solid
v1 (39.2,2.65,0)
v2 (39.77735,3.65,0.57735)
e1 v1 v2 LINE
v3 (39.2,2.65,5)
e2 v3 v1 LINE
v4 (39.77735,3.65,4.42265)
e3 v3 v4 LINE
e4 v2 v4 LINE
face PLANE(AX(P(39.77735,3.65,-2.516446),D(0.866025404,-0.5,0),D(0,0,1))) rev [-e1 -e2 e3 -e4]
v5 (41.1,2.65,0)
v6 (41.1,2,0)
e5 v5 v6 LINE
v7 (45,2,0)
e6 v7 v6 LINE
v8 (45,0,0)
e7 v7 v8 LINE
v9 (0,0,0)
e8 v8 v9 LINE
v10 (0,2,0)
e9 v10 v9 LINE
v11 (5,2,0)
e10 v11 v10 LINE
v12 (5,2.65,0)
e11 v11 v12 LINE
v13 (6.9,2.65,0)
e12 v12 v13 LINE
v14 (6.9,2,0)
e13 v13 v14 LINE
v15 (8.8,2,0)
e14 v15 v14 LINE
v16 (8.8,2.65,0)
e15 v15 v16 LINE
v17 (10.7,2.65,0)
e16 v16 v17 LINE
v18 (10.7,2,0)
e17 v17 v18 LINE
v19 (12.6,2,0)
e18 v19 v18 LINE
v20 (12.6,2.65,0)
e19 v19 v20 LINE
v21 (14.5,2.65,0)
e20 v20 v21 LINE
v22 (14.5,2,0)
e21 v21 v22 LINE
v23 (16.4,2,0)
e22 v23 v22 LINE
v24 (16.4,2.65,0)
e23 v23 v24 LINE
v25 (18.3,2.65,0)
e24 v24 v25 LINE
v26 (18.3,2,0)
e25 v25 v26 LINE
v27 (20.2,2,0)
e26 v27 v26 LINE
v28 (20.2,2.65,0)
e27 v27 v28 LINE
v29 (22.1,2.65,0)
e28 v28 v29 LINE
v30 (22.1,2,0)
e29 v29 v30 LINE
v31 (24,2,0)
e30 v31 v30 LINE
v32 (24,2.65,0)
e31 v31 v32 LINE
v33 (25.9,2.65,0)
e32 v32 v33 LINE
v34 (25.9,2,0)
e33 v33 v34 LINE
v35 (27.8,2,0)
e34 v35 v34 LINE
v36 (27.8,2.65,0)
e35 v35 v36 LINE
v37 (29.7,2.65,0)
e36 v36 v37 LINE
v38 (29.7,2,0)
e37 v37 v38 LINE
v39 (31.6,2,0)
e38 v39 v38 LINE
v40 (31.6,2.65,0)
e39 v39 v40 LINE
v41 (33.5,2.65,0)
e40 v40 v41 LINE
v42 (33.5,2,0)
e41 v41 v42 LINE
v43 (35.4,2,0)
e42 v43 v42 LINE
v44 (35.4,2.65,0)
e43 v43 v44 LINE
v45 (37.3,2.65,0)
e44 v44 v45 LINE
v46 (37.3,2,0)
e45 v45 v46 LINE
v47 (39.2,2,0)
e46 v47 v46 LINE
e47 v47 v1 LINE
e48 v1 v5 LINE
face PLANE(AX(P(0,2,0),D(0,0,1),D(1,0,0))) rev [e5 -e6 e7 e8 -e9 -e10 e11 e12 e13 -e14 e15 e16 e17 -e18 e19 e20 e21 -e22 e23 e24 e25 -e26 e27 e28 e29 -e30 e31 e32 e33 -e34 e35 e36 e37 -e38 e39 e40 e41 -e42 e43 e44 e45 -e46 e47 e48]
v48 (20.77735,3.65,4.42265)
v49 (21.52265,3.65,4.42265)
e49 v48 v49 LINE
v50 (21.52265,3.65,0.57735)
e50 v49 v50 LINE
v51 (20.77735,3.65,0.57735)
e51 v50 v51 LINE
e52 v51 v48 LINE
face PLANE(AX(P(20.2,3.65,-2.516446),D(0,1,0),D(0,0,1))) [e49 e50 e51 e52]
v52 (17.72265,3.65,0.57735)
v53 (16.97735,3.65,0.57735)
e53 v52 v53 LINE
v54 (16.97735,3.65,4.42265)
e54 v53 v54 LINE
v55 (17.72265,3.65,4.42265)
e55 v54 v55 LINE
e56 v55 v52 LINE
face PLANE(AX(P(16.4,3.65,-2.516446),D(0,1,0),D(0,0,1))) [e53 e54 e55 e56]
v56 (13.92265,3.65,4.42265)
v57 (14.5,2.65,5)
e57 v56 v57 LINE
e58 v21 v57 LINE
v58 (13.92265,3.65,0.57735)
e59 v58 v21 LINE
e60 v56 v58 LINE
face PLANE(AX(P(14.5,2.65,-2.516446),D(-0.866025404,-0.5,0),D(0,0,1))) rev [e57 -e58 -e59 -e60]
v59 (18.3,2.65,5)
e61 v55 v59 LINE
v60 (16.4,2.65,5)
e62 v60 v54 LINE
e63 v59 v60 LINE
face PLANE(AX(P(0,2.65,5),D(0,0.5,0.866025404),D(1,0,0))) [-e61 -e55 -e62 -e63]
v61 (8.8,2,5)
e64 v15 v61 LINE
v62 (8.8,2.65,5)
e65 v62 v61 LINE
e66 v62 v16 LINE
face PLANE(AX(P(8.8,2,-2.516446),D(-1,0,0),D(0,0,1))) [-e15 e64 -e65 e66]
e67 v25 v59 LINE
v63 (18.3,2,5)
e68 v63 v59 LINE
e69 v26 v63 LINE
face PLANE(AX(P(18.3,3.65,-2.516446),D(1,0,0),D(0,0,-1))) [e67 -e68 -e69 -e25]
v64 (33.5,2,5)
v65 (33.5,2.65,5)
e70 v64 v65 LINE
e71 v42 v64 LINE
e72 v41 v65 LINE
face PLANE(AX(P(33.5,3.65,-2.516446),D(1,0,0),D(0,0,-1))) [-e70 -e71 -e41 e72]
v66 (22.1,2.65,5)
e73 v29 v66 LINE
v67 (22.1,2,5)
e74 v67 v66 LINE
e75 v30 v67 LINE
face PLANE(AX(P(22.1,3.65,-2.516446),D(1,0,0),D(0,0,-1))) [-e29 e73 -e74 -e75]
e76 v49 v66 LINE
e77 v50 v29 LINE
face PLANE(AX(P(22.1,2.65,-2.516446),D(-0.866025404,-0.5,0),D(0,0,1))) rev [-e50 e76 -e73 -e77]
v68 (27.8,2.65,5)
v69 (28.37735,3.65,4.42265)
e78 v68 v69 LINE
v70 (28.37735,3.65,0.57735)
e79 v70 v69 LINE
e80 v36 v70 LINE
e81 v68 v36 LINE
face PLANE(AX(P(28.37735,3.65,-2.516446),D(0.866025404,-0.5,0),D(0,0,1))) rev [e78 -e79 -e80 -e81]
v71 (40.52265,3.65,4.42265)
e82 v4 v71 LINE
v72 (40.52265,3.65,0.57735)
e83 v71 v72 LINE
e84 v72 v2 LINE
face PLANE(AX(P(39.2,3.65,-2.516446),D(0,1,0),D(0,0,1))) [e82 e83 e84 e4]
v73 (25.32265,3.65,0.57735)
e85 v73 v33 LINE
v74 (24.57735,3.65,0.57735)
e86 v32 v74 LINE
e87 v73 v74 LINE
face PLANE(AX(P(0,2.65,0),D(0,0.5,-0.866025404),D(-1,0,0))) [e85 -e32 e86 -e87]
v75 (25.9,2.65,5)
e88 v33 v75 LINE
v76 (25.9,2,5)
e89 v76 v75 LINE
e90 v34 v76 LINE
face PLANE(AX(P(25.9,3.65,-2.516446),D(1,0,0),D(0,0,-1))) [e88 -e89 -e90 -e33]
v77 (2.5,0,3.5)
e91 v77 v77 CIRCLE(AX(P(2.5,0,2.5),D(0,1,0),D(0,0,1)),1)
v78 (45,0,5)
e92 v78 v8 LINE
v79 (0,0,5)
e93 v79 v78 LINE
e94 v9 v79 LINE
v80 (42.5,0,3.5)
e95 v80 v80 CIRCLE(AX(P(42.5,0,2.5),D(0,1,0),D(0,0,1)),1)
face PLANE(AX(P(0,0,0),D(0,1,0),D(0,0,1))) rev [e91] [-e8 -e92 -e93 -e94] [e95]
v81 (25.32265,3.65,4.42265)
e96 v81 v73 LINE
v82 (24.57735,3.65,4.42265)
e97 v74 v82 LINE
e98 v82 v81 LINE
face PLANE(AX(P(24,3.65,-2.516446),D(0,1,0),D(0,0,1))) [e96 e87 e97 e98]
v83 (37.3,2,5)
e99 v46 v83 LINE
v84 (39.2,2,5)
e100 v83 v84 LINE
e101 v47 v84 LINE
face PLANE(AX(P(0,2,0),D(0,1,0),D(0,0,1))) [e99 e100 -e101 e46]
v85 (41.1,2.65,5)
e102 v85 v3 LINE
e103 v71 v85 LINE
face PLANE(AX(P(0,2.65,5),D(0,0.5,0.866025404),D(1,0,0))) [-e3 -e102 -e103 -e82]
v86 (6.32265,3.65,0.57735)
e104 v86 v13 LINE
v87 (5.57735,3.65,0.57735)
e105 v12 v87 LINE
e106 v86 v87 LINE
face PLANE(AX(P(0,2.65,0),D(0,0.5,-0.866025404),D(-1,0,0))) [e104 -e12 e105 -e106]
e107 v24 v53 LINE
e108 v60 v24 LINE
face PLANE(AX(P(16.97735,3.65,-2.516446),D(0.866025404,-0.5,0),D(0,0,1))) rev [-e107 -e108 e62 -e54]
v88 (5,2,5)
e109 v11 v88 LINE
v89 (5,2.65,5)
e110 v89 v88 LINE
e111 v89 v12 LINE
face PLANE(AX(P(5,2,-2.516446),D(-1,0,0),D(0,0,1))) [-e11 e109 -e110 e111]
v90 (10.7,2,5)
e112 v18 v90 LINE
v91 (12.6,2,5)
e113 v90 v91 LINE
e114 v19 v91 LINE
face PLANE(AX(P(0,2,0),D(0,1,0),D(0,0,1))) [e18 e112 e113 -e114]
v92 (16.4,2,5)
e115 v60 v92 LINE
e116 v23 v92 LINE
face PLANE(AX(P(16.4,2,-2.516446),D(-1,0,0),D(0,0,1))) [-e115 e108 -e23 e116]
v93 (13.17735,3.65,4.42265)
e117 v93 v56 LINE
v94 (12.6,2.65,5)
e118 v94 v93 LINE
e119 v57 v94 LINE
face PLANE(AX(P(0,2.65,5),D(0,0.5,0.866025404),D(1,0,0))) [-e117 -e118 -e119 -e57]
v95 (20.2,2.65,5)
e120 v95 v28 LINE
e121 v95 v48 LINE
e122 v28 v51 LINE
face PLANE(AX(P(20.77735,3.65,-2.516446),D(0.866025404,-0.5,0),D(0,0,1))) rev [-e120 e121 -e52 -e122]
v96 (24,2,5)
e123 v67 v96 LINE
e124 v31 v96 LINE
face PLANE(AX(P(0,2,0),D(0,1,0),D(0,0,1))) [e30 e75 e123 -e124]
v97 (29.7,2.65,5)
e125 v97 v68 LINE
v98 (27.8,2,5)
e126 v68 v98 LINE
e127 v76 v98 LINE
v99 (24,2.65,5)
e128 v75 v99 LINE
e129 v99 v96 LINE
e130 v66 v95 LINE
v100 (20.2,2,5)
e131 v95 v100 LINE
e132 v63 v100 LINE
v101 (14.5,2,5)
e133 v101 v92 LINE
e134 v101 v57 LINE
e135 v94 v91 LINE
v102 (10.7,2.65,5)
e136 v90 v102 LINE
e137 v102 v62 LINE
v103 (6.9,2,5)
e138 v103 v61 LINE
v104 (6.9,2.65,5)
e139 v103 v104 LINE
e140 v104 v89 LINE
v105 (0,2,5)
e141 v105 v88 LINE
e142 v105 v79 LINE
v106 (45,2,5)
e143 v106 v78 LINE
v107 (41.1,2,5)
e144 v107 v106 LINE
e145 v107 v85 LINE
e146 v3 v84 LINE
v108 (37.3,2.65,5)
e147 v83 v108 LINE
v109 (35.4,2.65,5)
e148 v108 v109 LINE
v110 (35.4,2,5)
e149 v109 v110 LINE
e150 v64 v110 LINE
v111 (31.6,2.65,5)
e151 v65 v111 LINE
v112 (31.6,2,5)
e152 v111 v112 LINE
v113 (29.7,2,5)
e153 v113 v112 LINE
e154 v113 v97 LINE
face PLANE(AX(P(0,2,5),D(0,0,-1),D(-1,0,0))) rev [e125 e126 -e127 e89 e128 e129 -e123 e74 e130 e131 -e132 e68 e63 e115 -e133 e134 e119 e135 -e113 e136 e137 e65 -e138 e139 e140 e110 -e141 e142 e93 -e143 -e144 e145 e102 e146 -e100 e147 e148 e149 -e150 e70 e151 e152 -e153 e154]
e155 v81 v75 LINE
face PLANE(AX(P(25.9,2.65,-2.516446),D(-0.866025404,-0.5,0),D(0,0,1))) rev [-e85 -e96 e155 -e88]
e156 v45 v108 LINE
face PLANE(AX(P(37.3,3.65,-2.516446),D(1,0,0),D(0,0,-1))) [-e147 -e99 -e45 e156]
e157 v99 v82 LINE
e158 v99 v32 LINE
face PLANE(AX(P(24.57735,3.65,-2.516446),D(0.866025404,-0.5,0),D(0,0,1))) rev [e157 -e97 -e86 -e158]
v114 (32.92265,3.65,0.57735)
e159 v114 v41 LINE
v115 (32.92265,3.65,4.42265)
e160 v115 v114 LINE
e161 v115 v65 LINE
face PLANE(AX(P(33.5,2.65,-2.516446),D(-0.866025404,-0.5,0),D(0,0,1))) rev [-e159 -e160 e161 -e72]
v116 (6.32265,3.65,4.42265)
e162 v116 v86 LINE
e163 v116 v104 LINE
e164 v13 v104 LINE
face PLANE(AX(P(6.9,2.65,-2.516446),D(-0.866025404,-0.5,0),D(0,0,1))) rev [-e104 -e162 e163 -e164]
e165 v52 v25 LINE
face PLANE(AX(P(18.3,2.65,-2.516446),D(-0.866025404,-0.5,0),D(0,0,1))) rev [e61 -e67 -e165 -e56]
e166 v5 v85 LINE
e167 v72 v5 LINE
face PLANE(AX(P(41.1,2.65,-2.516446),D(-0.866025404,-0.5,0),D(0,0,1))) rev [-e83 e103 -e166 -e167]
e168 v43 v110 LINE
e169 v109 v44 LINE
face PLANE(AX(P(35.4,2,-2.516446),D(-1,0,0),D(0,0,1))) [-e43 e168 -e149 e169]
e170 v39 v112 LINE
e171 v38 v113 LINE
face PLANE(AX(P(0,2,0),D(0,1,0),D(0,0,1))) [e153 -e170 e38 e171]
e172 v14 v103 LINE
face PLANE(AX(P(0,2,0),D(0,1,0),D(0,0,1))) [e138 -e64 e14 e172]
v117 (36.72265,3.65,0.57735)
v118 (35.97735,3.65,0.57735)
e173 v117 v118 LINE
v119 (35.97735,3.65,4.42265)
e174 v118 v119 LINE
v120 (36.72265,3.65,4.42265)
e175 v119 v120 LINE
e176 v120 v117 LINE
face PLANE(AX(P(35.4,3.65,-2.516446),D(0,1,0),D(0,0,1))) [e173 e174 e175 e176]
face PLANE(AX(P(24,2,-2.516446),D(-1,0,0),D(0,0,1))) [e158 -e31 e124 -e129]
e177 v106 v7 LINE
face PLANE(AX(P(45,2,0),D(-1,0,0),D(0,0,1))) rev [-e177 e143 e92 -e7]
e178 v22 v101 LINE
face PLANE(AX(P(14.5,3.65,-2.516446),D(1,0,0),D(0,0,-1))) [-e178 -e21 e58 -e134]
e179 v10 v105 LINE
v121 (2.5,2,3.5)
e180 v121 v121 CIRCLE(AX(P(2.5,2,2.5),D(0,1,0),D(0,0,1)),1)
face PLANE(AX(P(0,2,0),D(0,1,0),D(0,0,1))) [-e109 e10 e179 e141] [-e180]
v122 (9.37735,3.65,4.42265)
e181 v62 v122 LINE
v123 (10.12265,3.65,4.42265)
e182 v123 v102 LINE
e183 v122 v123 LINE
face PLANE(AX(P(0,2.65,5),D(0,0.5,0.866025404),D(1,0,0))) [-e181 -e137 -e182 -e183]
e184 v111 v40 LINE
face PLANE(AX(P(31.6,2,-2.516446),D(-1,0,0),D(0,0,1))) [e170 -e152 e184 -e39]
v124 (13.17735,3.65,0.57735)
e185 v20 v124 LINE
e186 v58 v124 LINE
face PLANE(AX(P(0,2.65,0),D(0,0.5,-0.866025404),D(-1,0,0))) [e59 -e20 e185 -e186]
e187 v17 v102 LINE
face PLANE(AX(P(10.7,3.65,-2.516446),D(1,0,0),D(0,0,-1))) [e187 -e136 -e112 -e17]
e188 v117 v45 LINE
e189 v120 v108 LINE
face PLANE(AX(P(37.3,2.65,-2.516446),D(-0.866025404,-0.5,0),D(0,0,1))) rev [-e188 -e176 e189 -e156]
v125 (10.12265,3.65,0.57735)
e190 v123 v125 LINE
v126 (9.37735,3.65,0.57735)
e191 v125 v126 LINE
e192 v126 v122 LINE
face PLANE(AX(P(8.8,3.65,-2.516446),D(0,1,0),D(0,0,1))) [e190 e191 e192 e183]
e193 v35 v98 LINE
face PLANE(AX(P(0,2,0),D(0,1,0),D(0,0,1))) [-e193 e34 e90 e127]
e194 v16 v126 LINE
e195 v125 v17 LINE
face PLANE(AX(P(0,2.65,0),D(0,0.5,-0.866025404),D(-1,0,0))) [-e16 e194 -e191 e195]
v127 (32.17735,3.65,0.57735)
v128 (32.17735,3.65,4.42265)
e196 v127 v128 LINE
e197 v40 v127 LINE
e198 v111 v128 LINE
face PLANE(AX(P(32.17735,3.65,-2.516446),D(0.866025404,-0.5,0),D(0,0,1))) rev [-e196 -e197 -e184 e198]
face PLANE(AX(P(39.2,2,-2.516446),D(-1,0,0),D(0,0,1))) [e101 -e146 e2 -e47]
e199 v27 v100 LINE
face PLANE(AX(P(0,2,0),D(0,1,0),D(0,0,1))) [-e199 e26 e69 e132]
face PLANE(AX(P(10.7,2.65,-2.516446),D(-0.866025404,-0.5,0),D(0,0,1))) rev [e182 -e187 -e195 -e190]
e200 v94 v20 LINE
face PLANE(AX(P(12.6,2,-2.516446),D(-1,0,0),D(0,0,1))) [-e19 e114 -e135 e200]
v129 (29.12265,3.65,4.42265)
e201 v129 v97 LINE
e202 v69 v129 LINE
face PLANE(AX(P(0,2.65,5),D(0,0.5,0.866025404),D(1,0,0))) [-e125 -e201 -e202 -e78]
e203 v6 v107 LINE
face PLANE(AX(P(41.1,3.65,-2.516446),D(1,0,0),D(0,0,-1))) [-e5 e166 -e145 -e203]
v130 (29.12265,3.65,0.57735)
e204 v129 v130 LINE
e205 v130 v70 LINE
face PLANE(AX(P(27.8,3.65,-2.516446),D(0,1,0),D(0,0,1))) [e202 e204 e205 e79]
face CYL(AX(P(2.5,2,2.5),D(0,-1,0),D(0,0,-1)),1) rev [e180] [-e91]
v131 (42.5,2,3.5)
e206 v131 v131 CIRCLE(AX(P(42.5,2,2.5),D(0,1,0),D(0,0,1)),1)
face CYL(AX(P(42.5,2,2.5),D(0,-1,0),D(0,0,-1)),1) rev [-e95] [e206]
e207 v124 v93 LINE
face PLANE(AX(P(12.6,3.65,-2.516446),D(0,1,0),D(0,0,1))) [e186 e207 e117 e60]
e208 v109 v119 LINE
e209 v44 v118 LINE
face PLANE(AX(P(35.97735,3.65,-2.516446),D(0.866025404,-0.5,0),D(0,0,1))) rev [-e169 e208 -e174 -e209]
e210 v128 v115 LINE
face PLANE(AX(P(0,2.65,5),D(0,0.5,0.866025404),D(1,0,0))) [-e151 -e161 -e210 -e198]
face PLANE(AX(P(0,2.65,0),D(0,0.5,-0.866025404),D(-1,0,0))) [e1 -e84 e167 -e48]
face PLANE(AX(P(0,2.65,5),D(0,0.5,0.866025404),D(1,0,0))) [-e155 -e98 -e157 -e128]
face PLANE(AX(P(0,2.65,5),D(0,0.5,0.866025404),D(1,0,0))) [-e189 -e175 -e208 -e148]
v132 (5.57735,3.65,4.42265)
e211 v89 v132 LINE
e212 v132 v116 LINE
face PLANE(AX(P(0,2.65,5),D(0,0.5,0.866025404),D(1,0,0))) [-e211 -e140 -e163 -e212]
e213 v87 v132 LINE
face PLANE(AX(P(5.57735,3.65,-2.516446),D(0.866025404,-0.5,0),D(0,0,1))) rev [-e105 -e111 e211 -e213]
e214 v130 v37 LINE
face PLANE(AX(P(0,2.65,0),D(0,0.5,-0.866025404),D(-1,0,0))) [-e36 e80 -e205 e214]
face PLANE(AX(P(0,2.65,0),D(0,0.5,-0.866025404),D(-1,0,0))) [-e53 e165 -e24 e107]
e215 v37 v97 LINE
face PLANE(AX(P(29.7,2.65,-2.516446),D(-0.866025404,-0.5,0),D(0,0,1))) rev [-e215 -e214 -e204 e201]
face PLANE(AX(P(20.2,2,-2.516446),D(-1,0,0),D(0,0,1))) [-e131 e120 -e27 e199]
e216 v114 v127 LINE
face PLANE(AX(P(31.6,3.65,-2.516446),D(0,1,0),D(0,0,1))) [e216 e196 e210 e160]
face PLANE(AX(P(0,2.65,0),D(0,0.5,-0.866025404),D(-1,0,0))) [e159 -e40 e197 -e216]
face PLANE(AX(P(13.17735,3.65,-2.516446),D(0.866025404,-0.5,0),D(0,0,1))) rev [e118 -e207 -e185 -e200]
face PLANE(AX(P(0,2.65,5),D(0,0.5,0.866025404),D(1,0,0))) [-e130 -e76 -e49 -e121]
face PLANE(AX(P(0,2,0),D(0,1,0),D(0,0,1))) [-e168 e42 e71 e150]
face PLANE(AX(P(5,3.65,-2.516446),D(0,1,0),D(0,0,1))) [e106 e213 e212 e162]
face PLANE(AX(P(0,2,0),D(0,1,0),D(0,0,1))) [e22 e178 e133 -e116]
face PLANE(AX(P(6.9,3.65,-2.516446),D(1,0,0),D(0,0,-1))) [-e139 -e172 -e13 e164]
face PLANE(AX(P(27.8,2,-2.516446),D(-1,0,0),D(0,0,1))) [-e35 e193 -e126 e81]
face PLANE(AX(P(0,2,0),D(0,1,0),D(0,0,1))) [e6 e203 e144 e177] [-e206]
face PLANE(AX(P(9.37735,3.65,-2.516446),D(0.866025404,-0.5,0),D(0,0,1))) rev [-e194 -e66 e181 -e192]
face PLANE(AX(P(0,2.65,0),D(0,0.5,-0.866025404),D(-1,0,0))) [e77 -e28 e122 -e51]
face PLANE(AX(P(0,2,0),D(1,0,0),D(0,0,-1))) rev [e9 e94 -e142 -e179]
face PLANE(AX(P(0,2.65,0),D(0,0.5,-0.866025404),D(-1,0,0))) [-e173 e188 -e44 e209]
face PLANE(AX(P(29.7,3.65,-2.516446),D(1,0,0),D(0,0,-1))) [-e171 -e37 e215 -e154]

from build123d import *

# Parameters (mm, degrees)
SKETCH1_W                    = 45
SKETCH1_H                    = 5
SKETCH1_R                    = 1
BOSS_EXTRUDE1_DEPTH          = 2
SKETCH2_W                    = 1.9
SKETCH2_H                    = 1.65
BOSS_EXTRUDE2_DEPTH          = 5
CHAMFER1_SIZE                = 1
CHAMFER1_SIZE_2              = 0.577350269
LPATTERN1_COUNT              = 10
LPATTERN1_PITCH              = 3.8
CHAMFER1_OF_LPATTERN1_SIZE   = 1
CHAMFER1_OF_LPATTERN1_SIZE_2 = 0.577350269


with BuildPart() as part:
    # Sketch1 → Boss-Extrude1 (new body)
    with BuildSketch(Plane(origin=(0, 0, 0), x_dir=(1, 0, 0), z_dir=(0, 1, 0))):
        with Locations((22.5, -2.5)):
            Rectangle(SKETCH1_W, SKETCH1_H)
        with Locations(Location((2.5, -2.5, 0), (0, 0, 270))):
            Circle(SKETCH1_R, mode=Mode.SUBTRACT)
        with Locations(Location((42.5, -2.5, 0), (0, 0, 270))):
            Circle(SKETCH1_R, mode=Mode.SUBTRACT)
    extrude(amount=BOSS_EXTRUDE1_DEPTH)

    # Sketch2 → Boss-Extrude2 (add)
    with BuildSketch(Plane.XY.offset(5)):
        with Locations((5.95, 2.825)):
            Rectangle(SKETCH2_W, SKETCH2_H)
    boss_extrude2 = extrude(amount=-BOSS_EXTRUDE2_DEPTH)

    # Chamfer1
    # the kernel refuses this chamfer: 1, 0.577350269 mm, written as the material it takes off along each edge
    with BuildSketch(Plane(origin=(2.412914245, 3.65, 0), x_dir=(0, -0.9998132206222079, -0.019326765612700737), z_dir=(1, 0, 0))) as chamfer1_piece_1:
        Polygon((CHAMFER1_SIZE * 0.999813220622, -CHAMFER1_SIZE * 0.0193267656127), (-CHAMFER1_SIZE_2 * 0.019326765619, -CHAMFER1_SIZE_2 * 0.999813220951), (0, 0), align=None)
    extrude(amount=7.074171509, mode=Mode.SUBTRACT)
    with BuildSketch(Plane(origin=(2.412914245, 3.65, 5), x_dir=(0, -0.9998132206222079, 0.01932676561270115), z_dir=(1, 0, 0))) as chamfer1_piece_2:
        Polygon((CHAMFER1_SIZE * 0.999813220622, CHAMFER1_SIZE * 0.0193267656127), (-CHAMFER1_SIZE_2 * 0.019326765619, CHAMFER1_SIZE_2 * 0.999813220951), (0, 0), align=None)
    extrude(amount=7.074171509, mode=Mode.SUBTRACT)
    with BuildSketch(Plane(origin=(6.9, 3.65, 7.587085755), x_dir=(-0.9983227437537925, 0.0578938624026711, 0), z_dir=(0, 0, -1))) as chamfer1_piece_3:
        Polygon((CHAMFER1_SIZE_2 * 0.998322744082, -CHAMFER1_SIZE_2 * 0.0578938624217), (-CHAMFER1_SIZE * 0.0578938624027, -CHAMFER1_SIZE * 0.998322743754), (0, 0), align=None)
    extrude(amount=10.174171509, mode=Mode.SUBTRACT)
    with BuildSketch(Plane(origin=(5, 3.65, 7.587085755), x_dir=(-0.01932676561270115, -0.9998132206222079, 0), z_dir=(0, 0, -1))) as chamfer1_piece_4:
        Polygon((CHAMFER1_SIZE * 0.999813220622, -CHAMFER1_SIZE * 0.0193267656127), (-CHAMFER1_SIZE_2 * 0.019326765619, -CHAMFER1_SIZE_2 * 0.999813220951), (0, 0), align=None)
    extrude(amount=10.174171509, mode=Mode.SUBTRACT)

    # LPattern1: Boss-Extrude2 ×10
    with Locations(*[(i * LPATTERN1_PITCH, 0, 0) for i in range(1, LPATTERN1_COUNT)]):
        add(boss_extrude2)

    # Chamfer1 of LPattern1
    # the kernel refuses this chamfer: 1, 0.577350269 mm, written as the material it takes off along each edge
    with BuildSketch(Plane(origin=(6.212914245, 3.65, 0), x_dir=(0, -0.9998132206222079, -0.019326765612700737), z_dir=(1, 0, 0)), Plane(origin=(10.012914245, 3.65, 0), x_dir=(0, -0.9998132206222079, -0.019326765612700737), z_dir=(1, 0, 0)), Plane(origin=(13.812914245, 3.65, 0), x_dir=(0, -0.9998132206222079, -0.019326765612700737), z_dir=(1, 0, 0)), Plane(origin=(17.612914245, 3.65, 0), x_dir=(0, -0.9998132206222079, -0.019326765612700737), z_dir=(1, 0, 0)), Plane(origin=(21.412914245, 3.65, 0), x_dir=(0, -0.9998132206222079, -0.019326765612700737), z_dir=(1, 0, 0)), Plane(origin=(25.212914245, 3.65, 0), x_dir=(0, -0.9998132206222079, -0.019326765612700737), z_dir=(1, 0, 0)), Plane(origin=(29.012914245, 3.65, 0), x_dir=(0, -0.9998132206222079, -0.019326765612700737), z_dir=(1, 0, 0)), Plane(origin=(32.812914245, 3.65, 0), x_dir=(0, -0.9998132206222079, -0.019326765612700737), z_dir=(1, 0, 0)), Plane(origin=(36.612914245, 3.65, 0), x_dir=(0, -0.9998132206222079, -0.019326765612700737), z_dir=(1, 0, 0))) as chamfer1_of_lpattern1_piece_1:
        Polygon((CHAMFER1_OF_LPATTERN1_SIZE * 0.999813220622, -CHAMFER1_OF_LPATTERN1_SIZE * 0.0193267656127), (-CHAMFER1_OF_LPATTERN1_SIZE_2 * 0.019326765619, -CHAMFER1_OF_LPATTERN1_SIZE_2 * 0.999813220951), (0, 0), align=None)
    extrude(amount=7.074171509, mode=Mode.SUBTRACT)
    with BuildSketch(Plane(origin=(6.212914245, 3.65, 5), x_dir=(0, 0.0578938624026711, -0.9983227437537925), z_dir=(1, 0, 0)), Plane(origin=(10.012914245, 3.65, 5), x_dir=(0, 0.0578938624026711, -0.9983227437537925), z_dir=(1, 0, 0)), Plane(origin=(13.812914245, 3.65, 5), x_dir=(0, 0.0578938624026711, -0.9983227437537925), z_dir=(1, 0, 0)), Plane(origin=(17.612914245, 3.65, 5), x_dir=(0, 0.0578938624026711, -0.9983227437537925), z_dir=(1, 0, 0)), Plane(origin=(21.412914245, 3.65, 5), x_dir=(0, 0.0578938624026711, -0.9983227437537925), z_dir=(1, 0, 0)), Plane(origin=(25.212914245, 3.65, 5), x_dir=(0, 0.0578938624026711, -0.9983227437537925), z_dir=(1, 0, 0)), Plane(origin=(29.012914245, 3.65, 5), x_dir=(0, 0.0578938624026711, -0.9983227437537925), z_dir=(1, 0, 0)), Plane(origin=(32.812914245, 3.65, 5), x_dir=(0, 0.0578938624026711, -0.9983227437537925), z_dir=(1, 0, 0))) as chamfer1_of_lpattern1_piece_2:
        Polygon((CHAMFER1_OF_LPATTERN1_SIZE_2 * 0.998322744082, -CHAMFER1_OF_LPATTERN1_SIZE_2 * 0.0578938624217), (-CHAMFER1_OF_LPATTERN1_SIZE * 0.0578938624027, -CHAMFER1_OF_LPATTERN1_SIZE * 0.998322743754), (0, 0), align=None)
    extrude(amount=7.074171509, mode=Mode.SUBTRACT)
    with BuildSketch(Plane(origin=(10.7, 3.65, 7.587085755), x_dir=(-0.9983227437537925, 0.0578938624026711, 0), z_dir=(0, 0, -1)), Plane(origin=(14.5, 3.65, 7.587085755), x_dir=(-0.9983227437537925, 0.0578938624026711, 0), z_dir=(0, 0, -1)), Plane(origin=(18.3, 3.65, 7.587085755), x_dir=(-0.9983227437537925, 0.057893862402671276, 0), z_dir=(0, 0, -1)), Plane(origin=(22.1, 3.65, 7.587085755), x_dir=(-0.9983227437537925, 0.057893862402671276, 0), z_dir=(0, 0, -1)), Plane(origin=(25.9, 3.65, 7.587085755), x_dir=(-0.9983227437537925, 0.057893862402671276, 0), z_dir=(0, 0, -1)), Plane(origin=(29.7, 3.65, 7.587085755), x_dir=(-0.9983227437537925, 0.057893862402671276, 0), z_dir=(0, 0, -1)), Plane(origin=(33.5, 3.65, 7.587085755), x_dir=(-0.9983227437537927, 0.05789386240266986, 0), z_dir=(0, 0, -1)), Plane(origin=(37.3, 3.65, 7.587085755), x_dir=(-0.9983227437537927, 0.05789386240266986, 0), z_dir=(0, 0, -1)), Plane(origin=(41.1, 3.65, 7.587085755), x_dir=(-0.9983227437537927, 0.05789386240266986, 0), z_dir=(0, 0, -1))) as chamfer1_of_lpattern1_piece_3:
        Polygon((CHAMFER1_OF_LPATTERN1_SIZE_2 * 0.998322744082, -CHAMFER1_OF_LPATTERN1_SIZE_2 * 0.0578938624217), (-CHAMFER1_OF_LPATTERN1_SIZE * 0.0578938624027, -CHAMFER1_OF_LPATTERN1_SIZE * 0.998322743754), (0, 0), align=None)
    extrude(amount=10.174171509, mode=Mode.SUBTRACT)
    with BuildSketch(Plane(origin=(8.8, 3.65, 7.587085755), x_dir=(-0.01932676561270029, -0.9998132206222079, 0), z_dir=(0, 0, -1)), Plane(origin=(12.6, 3.65, 7.587085755), x_dir=(-0.01932676561270029, -0.9998132206222079, 0), z_dir=(0, 0, -1)), Plane(origin=(16.4, 3.65, 7.587085755), x_dir=(-0.01932676561270029, -0.9998132206222079, 0), z_dir=(0, 0, -1)), Plane(origin=(20.2, 3.65, 7.587085755), x_dir=(-0.01932676561270029, -0.9998132206222079, 0), z_dir=(0, 0, -1)), Plane(origin=(24, 3.65, 7.587085755), x_dir=(-0.01932676561270029, -0.9998132206222079, 0), z_dir=(0, 0, -1)), Plane(origin=(27.8, 3.65, 7.587085755), x_dir=(-0.01932676561270029, -0.9998132206222079, 0), z_dir=(0, 0, -1)), Plane(origin=(31.6, 3.65, 7.587085755), x_dir=(-0.0193267656127003, -0.9998132206222079, 0), z_dir=(0, 0, -1)), Plane(origin=(35.4, 3.65, 7.587085755), x_dir=(-0.01932676561270373, -0.9998132206222079, 0), z_dir=(0, 0, -1)), Plane(origin=(39.2, 3.65, 7.587085755), x_dir=(-0.01932676561270373, -0.9998132206222079, 0), z_dir=(0, 0, -1))) as chamfer1_of_lpattern1_piece_4:
        Polygon((CHAMFER1_OF_LPATTERN1_SIZE * 0.999813220622, -CHAMFER1_OF_LPATTERN1_SIZE * 0.0193267656127), (-CHAMFER1_OF_LPATTERN1_SIZE_2 * 0.019326765619, -CHAMFER1_OF_LPATTERN1_SIZE_2 * 0.999813220951), (0, 0), align=None)
    extrude(amount=10.174171509, mode=Mode.SUBTRACT)
    with BuildSketch(Plane(origin=(36.612914245, 3.65, 5), x_dir=(0, -0.9998132206222079, 0.01932676561270115), z_dir=(1, 0, 0))) as chamfer1_of_lpattern1_piece_5:
        Polygon((CHAMFER1_OF_LPATTERN1_SIZE * 0.999813220622, CHAMFER1_OF_LPATTERN1_SIZE * 0.0193267656127), (-CHAMFER1_OF_LPATTERN1_SIZE_2 * 0.019326765619, CHAMFER1_OF_LPATTERN1_SIZE_2 * 0.999813220951), (0, 0), align=None)
    extrude(amount=7.074171509, mode=Mode.SUBTRACT)


solid = part.part
